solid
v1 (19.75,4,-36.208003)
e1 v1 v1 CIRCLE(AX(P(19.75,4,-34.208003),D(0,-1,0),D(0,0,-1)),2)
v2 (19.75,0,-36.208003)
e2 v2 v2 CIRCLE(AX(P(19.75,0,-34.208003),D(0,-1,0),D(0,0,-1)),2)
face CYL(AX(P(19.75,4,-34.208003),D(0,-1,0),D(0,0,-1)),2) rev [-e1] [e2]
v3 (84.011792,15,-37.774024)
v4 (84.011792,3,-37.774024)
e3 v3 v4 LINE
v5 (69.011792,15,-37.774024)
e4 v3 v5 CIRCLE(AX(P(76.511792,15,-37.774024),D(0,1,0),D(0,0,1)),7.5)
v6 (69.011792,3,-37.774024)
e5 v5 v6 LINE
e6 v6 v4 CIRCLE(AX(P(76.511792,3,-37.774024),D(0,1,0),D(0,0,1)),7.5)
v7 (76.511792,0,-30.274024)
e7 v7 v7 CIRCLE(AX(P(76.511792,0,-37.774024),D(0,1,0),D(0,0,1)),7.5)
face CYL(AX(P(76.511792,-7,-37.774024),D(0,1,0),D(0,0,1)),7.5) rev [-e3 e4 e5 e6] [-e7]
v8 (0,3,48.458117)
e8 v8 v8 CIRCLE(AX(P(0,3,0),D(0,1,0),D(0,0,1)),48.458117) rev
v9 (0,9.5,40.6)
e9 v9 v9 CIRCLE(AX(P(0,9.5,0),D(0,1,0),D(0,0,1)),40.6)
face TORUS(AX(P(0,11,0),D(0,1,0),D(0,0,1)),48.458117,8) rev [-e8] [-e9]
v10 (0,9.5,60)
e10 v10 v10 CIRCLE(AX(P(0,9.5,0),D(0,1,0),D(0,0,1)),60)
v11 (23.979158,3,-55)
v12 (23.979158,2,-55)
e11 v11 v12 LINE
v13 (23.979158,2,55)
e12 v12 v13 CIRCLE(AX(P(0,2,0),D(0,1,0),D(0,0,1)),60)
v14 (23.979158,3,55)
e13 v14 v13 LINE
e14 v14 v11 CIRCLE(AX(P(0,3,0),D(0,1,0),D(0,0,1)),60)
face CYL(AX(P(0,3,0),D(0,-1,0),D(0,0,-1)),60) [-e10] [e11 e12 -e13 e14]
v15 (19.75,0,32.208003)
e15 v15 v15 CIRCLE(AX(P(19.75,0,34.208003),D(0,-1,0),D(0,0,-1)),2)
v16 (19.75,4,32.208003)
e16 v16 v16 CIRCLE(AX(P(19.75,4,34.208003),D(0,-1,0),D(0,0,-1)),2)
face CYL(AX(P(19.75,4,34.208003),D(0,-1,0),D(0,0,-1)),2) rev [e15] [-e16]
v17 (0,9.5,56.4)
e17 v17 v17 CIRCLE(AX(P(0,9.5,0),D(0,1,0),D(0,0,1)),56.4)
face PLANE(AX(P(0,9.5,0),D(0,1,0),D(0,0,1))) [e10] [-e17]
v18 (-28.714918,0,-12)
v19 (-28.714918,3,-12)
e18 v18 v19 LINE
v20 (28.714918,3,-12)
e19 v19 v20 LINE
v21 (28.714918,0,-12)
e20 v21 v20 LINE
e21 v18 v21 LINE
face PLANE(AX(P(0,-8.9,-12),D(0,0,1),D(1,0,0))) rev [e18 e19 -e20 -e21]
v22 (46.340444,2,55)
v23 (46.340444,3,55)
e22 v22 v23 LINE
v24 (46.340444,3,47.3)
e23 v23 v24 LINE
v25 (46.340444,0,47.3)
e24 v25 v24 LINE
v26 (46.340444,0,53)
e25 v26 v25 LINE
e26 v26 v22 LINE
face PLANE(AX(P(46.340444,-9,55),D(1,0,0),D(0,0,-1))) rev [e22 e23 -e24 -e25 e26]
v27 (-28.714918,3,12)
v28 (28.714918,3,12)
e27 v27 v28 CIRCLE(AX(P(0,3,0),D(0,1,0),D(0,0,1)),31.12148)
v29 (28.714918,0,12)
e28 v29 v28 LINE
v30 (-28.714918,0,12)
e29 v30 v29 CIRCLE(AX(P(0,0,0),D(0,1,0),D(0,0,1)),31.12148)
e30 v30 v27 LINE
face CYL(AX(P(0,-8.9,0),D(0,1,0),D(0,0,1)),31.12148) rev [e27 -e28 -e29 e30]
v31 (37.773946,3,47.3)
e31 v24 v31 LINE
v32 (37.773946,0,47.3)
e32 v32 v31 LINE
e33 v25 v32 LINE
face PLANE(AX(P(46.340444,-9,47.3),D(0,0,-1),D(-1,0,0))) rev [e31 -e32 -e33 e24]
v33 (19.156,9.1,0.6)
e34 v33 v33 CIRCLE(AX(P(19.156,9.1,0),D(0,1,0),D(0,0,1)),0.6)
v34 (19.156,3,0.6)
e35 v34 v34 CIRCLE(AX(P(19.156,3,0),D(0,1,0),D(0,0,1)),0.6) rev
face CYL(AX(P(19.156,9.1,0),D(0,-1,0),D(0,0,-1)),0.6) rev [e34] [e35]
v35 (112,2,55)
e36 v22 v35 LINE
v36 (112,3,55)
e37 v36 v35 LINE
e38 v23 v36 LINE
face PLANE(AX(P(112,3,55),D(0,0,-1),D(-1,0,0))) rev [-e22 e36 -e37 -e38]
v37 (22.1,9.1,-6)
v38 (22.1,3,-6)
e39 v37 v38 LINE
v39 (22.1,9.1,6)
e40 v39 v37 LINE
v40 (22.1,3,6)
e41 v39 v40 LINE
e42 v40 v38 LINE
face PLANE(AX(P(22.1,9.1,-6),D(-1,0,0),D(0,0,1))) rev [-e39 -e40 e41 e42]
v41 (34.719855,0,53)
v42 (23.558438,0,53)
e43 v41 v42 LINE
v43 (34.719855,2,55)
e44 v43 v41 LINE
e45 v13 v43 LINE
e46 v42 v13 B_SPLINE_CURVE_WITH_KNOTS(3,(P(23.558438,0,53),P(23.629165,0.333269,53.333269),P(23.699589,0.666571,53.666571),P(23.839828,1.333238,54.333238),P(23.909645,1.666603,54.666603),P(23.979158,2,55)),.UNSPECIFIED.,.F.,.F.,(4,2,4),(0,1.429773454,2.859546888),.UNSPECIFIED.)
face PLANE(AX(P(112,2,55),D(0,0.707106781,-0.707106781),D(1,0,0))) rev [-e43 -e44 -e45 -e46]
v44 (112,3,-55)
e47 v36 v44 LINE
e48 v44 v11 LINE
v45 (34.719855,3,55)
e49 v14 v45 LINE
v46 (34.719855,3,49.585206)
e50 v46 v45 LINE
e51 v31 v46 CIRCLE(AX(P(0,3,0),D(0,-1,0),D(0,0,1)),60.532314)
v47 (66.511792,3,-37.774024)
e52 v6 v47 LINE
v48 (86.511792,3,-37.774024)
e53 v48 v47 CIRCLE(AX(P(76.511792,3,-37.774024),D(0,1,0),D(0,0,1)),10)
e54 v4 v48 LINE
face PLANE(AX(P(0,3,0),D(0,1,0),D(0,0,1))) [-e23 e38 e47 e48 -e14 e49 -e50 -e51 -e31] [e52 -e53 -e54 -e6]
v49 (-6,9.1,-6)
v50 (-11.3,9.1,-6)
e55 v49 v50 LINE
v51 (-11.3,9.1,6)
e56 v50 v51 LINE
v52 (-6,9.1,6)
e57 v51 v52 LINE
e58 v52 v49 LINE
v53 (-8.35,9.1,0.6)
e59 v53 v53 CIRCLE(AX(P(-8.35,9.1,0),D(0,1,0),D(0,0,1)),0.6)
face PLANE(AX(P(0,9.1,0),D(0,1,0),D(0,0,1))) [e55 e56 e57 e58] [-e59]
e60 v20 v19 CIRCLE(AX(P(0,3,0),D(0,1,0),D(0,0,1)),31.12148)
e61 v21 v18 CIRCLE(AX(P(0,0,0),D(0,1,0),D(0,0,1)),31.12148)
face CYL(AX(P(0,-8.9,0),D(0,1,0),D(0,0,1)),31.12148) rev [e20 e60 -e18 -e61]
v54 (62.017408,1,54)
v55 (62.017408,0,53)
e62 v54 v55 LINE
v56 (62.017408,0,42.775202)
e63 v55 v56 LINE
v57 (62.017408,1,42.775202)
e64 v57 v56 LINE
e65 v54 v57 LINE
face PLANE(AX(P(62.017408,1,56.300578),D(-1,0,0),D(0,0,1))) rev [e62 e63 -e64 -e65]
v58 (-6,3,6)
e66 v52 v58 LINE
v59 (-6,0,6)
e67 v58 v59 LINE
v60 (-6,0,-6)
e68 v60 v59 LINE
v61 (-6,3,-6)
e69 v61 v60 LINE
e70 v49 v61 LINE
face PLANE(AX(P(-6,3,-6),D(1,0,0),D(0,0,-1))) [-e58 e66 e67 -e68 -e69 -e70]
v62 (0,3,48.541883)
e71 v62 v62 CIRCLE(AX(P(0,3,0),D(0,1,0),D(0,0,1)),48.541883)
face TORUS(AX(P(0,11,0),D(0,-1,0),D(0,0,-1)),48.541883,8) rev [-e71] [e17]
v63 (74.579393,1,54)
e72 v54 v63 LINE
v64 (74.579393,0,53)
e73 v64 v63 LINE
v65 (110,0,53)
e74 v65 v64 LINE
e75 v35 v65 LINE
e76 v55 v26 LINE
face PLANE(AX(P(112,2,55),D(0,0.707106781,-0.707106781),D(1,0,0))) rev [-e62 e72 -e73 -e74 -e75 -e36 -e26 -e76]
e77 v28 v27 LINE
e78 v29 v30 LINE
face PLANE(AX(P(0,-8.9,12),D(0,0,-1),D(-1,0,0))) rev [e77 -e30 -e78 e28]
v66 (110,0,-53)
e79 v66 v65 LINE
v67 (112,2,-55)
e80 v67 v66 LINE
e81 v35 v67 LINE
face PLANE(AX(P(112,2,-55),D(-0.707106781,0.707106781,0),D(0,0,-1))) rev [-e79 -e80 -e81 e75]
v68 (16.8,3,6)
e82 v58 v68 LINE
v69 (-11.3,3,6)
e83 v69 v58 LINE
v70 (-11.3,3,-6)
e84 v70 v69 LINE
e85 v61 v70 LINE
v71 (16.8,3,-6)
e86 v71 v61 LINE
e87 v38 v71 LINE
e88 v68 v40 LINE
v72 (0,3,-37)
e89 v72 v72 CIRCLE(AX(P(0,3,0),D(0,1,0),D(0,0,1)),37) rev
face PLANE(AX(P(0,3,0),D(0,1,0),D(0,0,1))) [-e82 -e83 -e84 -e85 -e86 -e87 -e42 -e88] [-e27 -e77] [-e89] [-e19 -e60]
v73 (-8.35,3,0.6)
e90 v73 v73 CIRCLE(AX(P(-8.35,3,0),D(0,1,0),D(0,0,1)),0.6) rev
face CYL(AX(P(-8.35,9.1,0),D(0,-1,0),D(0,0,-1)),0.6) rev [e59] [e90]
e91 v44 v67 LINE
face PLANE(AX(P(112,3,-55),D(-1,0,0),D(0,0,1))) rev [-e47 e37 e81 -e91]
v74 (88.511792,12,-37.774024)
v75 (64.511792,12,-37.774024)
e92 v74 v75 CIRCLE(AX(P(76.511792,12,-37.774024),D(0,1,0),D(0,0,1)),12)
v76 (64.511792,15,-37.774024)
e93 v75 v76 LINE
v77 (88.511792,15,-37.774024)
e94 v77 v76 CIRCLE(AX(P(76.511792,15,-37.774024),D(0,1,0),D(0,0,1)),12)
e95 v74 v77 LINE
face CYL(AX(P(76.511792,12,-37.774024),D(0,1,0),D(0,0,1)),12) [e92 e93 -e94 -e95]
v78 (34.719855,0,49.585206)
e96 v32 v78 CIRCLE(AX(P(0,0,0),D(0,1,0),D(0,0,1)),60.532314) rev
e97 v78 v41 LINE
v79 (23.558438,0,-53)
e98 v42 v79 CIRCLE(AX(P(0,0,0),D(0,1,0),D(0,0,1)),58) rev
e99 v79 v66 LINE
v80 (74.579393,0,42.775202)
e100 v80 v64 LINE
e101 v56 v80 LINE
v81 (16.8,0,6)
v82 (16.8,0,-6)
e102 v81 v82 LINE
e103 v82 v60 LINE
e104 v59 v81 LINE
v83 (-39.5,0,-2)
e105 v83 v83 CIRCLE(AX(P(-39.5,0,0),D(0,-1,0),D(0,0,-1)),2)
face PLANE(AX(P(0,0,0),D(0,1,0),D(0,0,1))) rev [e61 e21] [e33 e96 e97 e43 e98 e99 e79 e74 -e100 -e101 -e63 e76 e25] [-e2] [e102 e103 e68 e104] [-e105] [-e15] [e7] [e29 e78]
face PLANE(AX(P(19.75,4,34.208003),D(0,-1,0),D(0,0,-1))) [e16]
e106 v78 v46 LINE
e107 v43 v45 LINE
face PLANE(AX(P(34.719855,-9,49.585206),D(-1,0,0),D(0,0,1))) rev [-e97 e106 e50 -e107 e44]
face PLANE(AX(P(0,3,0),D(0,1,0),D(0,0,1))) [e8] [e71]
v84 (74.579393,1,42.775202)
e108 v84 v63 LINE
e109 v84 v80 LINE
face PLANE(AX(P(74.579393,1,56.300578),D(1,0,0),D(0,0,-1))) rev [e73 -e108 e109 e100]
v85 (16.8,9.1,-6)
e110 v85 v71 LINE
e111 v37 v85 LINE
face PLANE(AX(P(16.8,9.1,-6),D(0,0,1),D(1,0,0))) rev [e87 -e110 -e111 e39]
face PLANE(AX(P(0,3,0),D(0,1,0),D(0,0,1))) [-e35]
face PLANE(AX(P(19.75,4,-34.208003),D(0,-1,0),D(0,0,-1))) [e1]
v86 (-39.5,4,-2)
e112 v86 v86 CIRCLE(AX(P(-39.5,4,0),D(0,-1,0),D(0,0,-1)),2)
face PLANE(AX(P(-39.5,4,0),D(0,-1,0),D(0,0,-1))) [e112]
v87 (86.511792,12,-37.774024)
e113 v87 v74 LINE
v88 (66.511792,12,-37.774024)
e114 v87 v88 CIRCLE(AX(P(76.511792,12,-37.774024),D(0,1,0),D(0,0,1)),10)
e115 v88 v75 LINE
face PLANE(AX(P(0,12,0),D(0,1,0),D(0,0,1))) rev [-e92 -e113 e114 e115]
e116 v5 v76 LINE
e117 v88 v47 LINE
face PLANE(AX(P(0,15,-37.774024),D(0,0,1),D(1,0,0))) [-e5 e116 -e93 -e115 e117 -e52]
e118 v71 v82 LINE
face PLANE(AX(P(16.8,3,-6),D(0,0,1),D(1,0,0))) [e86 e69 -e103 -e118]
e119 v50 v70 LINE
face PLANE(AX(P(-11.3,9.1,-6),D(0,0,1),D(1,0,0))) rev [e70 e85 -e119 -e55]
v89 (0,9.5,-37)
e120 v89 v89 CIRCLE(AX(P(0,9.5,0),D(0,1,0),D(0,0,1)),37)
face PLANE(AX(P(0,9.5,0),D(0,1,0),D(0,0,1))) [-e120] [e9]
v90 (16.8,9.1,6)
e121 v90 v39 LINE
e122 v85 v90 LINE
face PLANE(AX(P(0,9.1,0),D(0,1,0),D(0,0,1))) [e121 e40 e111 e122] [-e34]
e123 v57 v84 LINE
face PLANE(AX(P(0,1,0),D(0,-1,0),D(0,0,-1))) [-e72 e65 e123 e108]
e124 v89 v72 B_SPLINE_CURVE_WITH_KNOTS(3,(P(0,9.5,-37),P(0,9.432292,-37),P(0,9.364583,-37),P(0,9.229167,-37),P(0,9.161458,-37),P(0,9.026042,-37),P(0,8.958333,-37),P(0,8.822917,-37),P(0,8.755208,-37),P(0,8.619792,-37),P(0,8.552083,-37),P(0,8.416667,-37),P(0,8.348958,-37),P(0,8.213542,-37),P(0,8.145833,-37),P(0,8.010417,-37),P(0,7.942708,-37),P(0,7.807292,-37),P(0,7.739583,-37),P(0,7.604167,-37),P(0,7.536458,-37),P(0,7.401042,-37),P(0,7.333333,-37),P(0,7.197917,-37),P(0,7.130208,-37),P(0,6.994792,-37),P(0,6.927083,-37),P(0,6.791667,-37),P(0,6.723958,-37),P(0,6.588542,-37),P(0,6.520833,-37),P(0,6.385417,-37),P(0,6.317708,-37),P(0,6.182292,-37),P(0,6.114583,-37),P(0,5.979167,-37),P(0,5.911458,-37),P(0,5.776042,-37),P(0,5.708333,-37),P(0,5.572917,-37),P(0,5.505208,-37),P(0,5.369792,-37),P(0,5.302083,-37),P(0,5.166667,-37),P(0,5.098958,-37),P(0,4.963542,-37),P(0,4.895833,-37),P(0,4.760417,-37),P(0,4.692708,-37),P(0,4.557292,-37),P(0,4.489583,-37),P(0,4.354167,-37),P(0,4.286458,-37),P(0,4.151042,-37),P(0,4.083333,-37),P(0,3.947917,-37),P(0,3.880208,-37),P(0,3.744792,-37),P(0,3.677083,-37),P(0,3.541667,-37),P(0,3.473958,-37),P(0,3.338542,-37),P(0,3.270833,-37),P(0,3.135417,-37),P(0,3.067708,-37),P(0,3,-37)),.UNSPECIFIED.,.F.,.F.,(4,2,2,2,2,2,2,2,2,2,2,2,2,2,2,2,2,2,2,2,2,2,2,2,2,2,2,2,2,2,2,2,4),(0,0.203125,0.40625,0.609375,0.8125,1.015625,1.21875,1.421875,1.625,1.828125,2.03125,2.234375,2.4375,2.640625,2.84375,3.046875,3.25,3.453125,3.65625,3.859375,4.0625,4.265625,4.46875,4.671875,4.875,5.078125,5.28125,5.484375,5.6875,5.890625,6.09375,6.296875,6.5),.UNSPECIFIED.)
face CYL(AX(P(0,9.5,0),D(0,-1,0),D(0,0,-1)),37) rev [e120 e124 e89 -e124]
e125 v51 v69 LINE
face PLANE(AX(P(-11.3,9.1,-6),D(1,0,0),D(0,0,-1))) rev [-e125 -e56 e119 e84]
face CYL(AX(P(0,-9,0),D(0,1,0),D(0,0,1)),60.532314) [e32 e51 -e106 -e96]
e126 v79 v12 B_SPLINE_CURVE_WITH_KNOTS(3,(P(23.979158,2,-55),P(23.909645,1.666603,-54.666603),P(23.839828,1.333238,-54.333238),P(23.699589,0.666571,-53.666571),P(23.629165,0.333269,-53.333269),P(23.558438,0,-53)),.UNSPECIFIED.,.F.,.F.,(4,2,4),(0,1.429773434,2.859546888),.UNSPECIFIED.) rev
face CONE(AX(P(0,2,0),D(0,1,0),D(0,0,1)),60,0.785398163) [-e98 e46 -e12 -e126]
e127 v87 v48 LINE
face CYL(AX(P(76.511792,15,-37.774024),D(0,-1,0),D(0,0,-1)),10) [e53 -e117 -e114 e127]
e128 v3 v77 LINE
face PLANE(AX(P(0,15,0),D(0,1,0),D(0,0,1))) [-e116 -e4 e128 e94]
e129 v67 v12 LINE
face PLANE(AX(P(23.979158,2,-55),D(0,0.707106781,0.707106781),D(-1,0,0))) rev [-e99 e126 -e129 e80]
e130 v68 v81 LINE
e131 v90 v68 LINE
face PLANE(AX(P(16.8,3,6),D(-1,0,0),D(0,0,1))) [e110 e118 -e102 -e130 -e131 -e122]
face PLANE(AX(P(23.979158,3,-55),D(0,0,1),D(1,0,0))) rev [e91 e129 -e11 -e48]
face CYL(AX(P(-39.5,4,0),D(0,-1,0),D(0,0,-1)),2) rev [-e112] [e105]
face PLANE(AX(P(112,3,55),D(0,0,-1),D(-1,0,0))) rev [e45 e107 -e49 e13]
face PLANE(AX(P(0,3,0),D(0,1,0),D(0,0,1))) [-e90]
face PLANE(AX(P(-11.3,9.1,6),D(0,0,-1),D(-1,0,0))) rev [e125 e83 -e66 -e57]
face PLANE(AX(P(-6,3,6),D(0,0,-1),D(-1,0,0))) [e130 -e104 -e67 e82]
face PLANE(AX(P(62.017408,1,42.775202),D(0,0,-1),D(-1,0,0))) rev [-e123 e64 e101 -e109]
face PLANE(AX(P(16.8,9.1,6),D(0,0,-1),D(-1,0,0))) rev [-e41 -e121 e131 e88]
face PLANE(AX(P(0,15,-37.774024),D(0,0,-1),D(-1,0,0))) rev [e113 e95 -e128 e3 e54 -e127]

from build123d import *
from build123d.topology import SkipClean

# Parameters (mm, degrees)
SKETCH1_W           = 22.8
SKETCH1_H           = 12
BOSS_EXTRUDE1_DEPTH = 3
SKETCH2_R           = 56.4
SKETCH2_R_2         = 40.6
SKETCH2_R_3         = 37
SKETCH2_W           = 22.8
SKETCH2_H           = 12
BOSS_EXTRUDE2_DEPTH = 6.5
FILLET1_R           = 8
SKETCH3_W           = 5.3
SKETCH3_H           = 12
SKETCH3_R           = 0.6
BOSS_EXTRUDE3_DEPTH = 6.1
CHAMFER1_SIZE       = 2
SKETCH4_W           = 12.561985035
SKETCH4_H           = 13.525375378
CUT_EXTRUDE1_DEPTH  = 1
SKETCH5_R           = 2
CUT_EXTRUDE2_DEPTH  = 4
CUT_EXTRUDE3_DEPTH  = 11.9
SKETCH7_R           = 7.5
CUT_EXTRUDE4_DEPTH  = 10
BOSS_EXTRUDE4_DEPTH = 12
BOSS_EXTRUDE5_DEPTH = 3
CUT_EXTRUDE5_DEPTH  = 12


with BuildPart() as part:
    # Sketch1 → Boss-Extrude1 (new body)
    with BuildSketch(Plane(origin=(0, 0, 0), x_dir=(1, 0, 0), z_dir=(0, 1, 0))):
        with BuildLine():
            Line((112, 55), (112, -55))
            Line((112, -55), (23.979157617, -55))
            ThreePointArc((23.979157617, -55), (-60, 0), (23.979157617, 55))
            Line((23.979157617, 55), (112, 55))
        make_face()
        with Locations((5.4, 0)):
            Rectangle(SKETCH1_W, SKETCH1_H, mode=Mode.SUBTRACT)
    extrude(amount=BOSS_EXTRUDE1_DEPTH)

    # Sketch2 → Boss-Extrude2 (add)
    # profile 1 of 4: a face of its own
    with SkipClean():  # the faces are left unmerged after this step: merging them gives an invalid solid
        with BuildSketch(Plane(origin=(0, 3, 0), x_dir=(1, 0, 0), z_dir=(0, 1, 0))):
            with BuildLine():
                ThreePointArc((23.979157617, -55), (50.193373352, -32.872865277), (60, 0))
                ThreePointArc((60, 0), (50.193373352, 32.872865277), (23.979157617, 55))
                ThreePointArc((23.979157617, 55), (-60, 0), (23.979157617, -55))
            make_face()
            with Locations(Location((0, 0, 0), (0, 0, 90))):
                Circle(SKETCH2_R, mode=Mode.SUBTRACT)
        # profile 2 of 4: a face of its own
        with BuildSketch(Plane(origin=(0, 3, 0), x_dir=(1, 0, 0), z_dir=(0, 1, 0))):
            with Locations(Location((0, 0, 0), (0, 0, 90))):
                Circle(SKETCH2_R_2)
            with Locations(Location((0, 0, 0), (0, 0, 90))):
                Circle(SKETCH2_R_3, mode=Mode.SUBTRACT)
        # profile 3 of 4: a face of its own
        with BuildSketch(Plane(origin=(0, 3, 0), x_dir=(1, 0, 0), z_dir=(0, 1, 0))):
            with Locations((5.4, 0)):
                Rectangle(SKETCH2_W, SKETCH2_H)
        # profile 4 of 4: a face of its own
        with BuildSketch(Plane(origin=(0, 3, 0), x_dir=(1, 0, 0), z_dir=(0, 1, 0))):
            with Locations((5.4, 0)):
                Rectangle(SKETCH2_W, SKETCH2_H)
        extrude(amount=BOSS_EXTRUDE2_DEPTH)


with BuildPart() as boss_extrude2_kept_piece:
    # of the separate pieces the step leaves, the one the design keeps (boss_extrude2_pieces_kept)
    add(part.part.solids().sort_by_distance((23.979157617, 0, -55))[0])

    # Fillet1
    # the kernel refuses this fillet: 8 mm, written as the material it adds along each edge
    with BuildSketch(Plane(origin=(0, 3, 0), x_dir=(0, 0, -1), z_dir=(1, 0, 0))) as fillet1_piece_1:
        with BuildLine():
            CenterArc((48.541883177, 8), FILLET1_R, 270, 79.193077125)
            Line((48.541883177, 0), (48.541883177, -0.16))
            Line((48.541883177, -0.16), (56.4, -0.16))
            Line((56.4, -0.16), (56.56, 0))
            ThreePointArc((56.56, 0), (56.56, 3.25), (56.557162336, 6.47))
            Line((56.557162336, 6.47), (56.4, 6.5))
        make_face()
    revolve(axis=Axis((0, 3, 0), (0, 1, 0)))
    with BuildSketch(Plane(origin=(0, 3, 0), x_dir=(0, 0, -1), z_dir=(1, 0, 0))) as fillet1_piece_2:
        with BuildLine():
            CenterArc((48.458116823, 8), FILLET1_R, 190.806922875, 79.193077125)
            Line((40.6, 6.5), (40.442837664, 6.47))
            ThreePointArc((40.442837664, 6.47), (40.44, 3.25), (40.44, 0))
            Line((40.44, 0), (40.6, -0.16))
            Line((40.6, -0.16), (48.458116823, -0.16))
            Line((48.458116823, -0.16), (48.458116823, 0))
        make_face()
    revolve(axis=Axis((0, 3, 0), (0, 1, 0)))

    # Sketch3 → Boss-Extrude3 (add)
    # profile 1 of 2: a face of its own
    with BuildSketch(Plane(origin=(0, 3, 0), x_dir=(1, 0, 0), z_dir=(0, 1, 0))):
        with Locations((-8.65, 0)):
            Rectangle(SKETCH3_W, SKETCH3_H)
        with Locations(Location((-8.35, 0, 0), (0, 0, 270))):
            Circle(SKETCH3_R, mode=Mode.SUBTRACT)
    # profile 2 of 2: a face of its own
    with BuildSketch(Plane(origin=(0, 3, 0), x_dir=(1, 0, 0), z_dir=(0, 1, 0))):
        with Locations((19.45, 0)):
            Rectangle(SKETCH3_W, SKETCH3_H)
        with Locations(Location((19.156, 0, 0), (0, 0, 270))):
            Circle(SKETCH3_R, mode=Mode.SUBTRACT)
    extrude(amount=BOSS_EXTRUDE3_DEPTH)

    # Chamfer1
    chamfer1_edges = [boss_extrude2_kept_piece.edges().sort_by_distance(p)[0] for p in [
        (112, 0, 0),
        (67.989578808, 0, 55),
        (-60, 0, 0),
        (67.989578808, 0, -55),
    ]]
    chamfer(chamfer1_edges, length=CHAMFER1_SIZE)

    # Sketch4 → Cut-Extrude1 (cut)
    with SkipClean():  # the faces are left unmerged after this step: merging them gives an invalid solid
        with BuildSketch(Plane.XZ):
            with Locations((68.298400031, 49.537890064)):
                Rectangle(SKETCH4_W, SKETCH4_H)
        extrude(amount=-CUT_EXTRUDE1_DEPTH, mode=Mode.SUBTRACT)

    # Sketch5 → Cut-Extrude2 (cut)
    with SkipClean():  # the faces are left unmerged after this step: merging them gives an invalid solid
        with BuildSketch(Plane.XZ):
            with Locations(Location((-39.5, 0, 0), (0, 0, 270))):
                Circle(SKETCH5_R)
            with Locations(Location((19.75, 34.208003449, 0), (0, 0, 270))):
                Circle(SKETCH5_R)
            with Locations(Location((19.75, -34.208003449, 0), (0, 0, 270))):
                Circle(SKETCH5_R)
        extrude(amount=-CUT_EXTRUDE2_DEPTH, mode=Mode.SUBTRACT)

    # Sketch6 → Cut-Extrude3 (cut)
    with SkipClean():  # the faces are left unmerged after this step: merging them gives an invalid solid
        with BuildSketch(Plane(origin=(0, 3, 0), x_dir=(1, 0, 0), z_dir=(0, 1, 0))):
            with BuildLine():
                Line((-28.714918284, 12), (0, 12))
                Line((0, 12), (28.714918284, 12))
                ThreePointArc((28.714918284, 12), (0, 31.121480236), (-28.714918284, 12))
            make_face()
            with BuildLine():
                Line((28.714918284, -12), (-28.714918284, -12))
                ThreePointArc((-28.714918284, -12), (0, -31.121480236), (28.714918284, -12))
            make_face()
        extrude(amount=-CUT_EXTRUDE3_DEPTH, mode=Mode.SUBTRACT)

    # Sketch7 → Cut-Extrude4 (cut)
    with SkipClean():  # the faces are left unmerged after this step: merging them gives an invalid solid
        with BuildSketch(Plane(origin=(0, 3, 0), x_dir=(1, 0, 0), z_dir=(0, 1, 0))):
            with Locations(Location((76.511791502, 37.774024263, 0), (0, 0, 270))):
                Circle(SKETCH7_R)
        extrude(amount=-CUT_EXTRUDE4_DEPTH, mode=Mode.SUBTRACT)

    # Sketch7<3> → Boss-Extrude4 (add)
    with SkipClean():  # the faces are left unmerged after this step: merging them gives an invalid solid
        with BuildSketch(Plane(origin=(0, 3, 0), x_dir=(1, 0, 0), z_dir=(0, 1, 0))):
            with BuildLine():
                Line((66.511791502, 37.774024263), (69.011791502, 37.774024263))
                ThreePointArc((69.011791502, 37.774024263), (76.511791502, 45.274024263), (84.011791502, 37.774024263))
                Line((84.011791502, 37.774024263), (86.511791502, 37.774024263))
                ThreePointArc((86.511791502, 37.774024263), (76.511791502, 47.774024263), (66.511791502, 37.774024263))
            make_face()
        extrude(amount=BOSS_EXTRUDE4_DEPTH)

    # Sketch8 → Boss-Extrude5 (add)
    with SkipClean():  # the faces are left unmerged after this step: merging them gives an invalid solid
        with BuildSketch(Plane(origin=(0, 15, 0), x_dir=(1, 0, 0), z_dir=(0, 1, 0))):
            with BuildLine():
                Line((64.511791502, 37.774024263), (66.511791502, 37.774024263))
                ThreePointArc((66.511791502, 37.774024263), (76.511791502, 47.774024263), (86.511791502, 37.774024263))
                Line((86.511791502, 37.774024263), (88.511791502, 37.774024263))
                ThreePointArc((88.511791502, 37.774024263), (76.511791502, 49.774024263), (64.511791502, 37.774024263))
            make_face()
        extrude(amount=-BOSS_EXTRUDE5_DEPTH)

    # Sketch9 → Cut-Extrude5 (cut)
    with SkipClean():  # the faces are left unmerged after this step: merging them gives an invalid solid
        with BuildSketch(Plane(origin=(0, 3, 0), x_dir=(1, 0, 0), z_dir=(0, 1, 0))):
            with BuildLine():
                Line((34.719854758, -55), (46.340443844, -55))
                Line((46.340443844, -55), (46.340443844, -47.3))
                Line((46.340443844, -47.3), (37.77394627, -47.3))
                ThreePointArc((37.77394627, -47.3), (36.264905061, -48.466665635), (34.719854758, -49.585206487))
                Line((34.719854758, -49.585206487), (34.719854758, -55))
            make_face()
        extrude(amount=-CUT_EXTRUDE5_DEPTH, mode=Mode.SUBTRACT)


solid = boss_extrude2_kept_piece.part
